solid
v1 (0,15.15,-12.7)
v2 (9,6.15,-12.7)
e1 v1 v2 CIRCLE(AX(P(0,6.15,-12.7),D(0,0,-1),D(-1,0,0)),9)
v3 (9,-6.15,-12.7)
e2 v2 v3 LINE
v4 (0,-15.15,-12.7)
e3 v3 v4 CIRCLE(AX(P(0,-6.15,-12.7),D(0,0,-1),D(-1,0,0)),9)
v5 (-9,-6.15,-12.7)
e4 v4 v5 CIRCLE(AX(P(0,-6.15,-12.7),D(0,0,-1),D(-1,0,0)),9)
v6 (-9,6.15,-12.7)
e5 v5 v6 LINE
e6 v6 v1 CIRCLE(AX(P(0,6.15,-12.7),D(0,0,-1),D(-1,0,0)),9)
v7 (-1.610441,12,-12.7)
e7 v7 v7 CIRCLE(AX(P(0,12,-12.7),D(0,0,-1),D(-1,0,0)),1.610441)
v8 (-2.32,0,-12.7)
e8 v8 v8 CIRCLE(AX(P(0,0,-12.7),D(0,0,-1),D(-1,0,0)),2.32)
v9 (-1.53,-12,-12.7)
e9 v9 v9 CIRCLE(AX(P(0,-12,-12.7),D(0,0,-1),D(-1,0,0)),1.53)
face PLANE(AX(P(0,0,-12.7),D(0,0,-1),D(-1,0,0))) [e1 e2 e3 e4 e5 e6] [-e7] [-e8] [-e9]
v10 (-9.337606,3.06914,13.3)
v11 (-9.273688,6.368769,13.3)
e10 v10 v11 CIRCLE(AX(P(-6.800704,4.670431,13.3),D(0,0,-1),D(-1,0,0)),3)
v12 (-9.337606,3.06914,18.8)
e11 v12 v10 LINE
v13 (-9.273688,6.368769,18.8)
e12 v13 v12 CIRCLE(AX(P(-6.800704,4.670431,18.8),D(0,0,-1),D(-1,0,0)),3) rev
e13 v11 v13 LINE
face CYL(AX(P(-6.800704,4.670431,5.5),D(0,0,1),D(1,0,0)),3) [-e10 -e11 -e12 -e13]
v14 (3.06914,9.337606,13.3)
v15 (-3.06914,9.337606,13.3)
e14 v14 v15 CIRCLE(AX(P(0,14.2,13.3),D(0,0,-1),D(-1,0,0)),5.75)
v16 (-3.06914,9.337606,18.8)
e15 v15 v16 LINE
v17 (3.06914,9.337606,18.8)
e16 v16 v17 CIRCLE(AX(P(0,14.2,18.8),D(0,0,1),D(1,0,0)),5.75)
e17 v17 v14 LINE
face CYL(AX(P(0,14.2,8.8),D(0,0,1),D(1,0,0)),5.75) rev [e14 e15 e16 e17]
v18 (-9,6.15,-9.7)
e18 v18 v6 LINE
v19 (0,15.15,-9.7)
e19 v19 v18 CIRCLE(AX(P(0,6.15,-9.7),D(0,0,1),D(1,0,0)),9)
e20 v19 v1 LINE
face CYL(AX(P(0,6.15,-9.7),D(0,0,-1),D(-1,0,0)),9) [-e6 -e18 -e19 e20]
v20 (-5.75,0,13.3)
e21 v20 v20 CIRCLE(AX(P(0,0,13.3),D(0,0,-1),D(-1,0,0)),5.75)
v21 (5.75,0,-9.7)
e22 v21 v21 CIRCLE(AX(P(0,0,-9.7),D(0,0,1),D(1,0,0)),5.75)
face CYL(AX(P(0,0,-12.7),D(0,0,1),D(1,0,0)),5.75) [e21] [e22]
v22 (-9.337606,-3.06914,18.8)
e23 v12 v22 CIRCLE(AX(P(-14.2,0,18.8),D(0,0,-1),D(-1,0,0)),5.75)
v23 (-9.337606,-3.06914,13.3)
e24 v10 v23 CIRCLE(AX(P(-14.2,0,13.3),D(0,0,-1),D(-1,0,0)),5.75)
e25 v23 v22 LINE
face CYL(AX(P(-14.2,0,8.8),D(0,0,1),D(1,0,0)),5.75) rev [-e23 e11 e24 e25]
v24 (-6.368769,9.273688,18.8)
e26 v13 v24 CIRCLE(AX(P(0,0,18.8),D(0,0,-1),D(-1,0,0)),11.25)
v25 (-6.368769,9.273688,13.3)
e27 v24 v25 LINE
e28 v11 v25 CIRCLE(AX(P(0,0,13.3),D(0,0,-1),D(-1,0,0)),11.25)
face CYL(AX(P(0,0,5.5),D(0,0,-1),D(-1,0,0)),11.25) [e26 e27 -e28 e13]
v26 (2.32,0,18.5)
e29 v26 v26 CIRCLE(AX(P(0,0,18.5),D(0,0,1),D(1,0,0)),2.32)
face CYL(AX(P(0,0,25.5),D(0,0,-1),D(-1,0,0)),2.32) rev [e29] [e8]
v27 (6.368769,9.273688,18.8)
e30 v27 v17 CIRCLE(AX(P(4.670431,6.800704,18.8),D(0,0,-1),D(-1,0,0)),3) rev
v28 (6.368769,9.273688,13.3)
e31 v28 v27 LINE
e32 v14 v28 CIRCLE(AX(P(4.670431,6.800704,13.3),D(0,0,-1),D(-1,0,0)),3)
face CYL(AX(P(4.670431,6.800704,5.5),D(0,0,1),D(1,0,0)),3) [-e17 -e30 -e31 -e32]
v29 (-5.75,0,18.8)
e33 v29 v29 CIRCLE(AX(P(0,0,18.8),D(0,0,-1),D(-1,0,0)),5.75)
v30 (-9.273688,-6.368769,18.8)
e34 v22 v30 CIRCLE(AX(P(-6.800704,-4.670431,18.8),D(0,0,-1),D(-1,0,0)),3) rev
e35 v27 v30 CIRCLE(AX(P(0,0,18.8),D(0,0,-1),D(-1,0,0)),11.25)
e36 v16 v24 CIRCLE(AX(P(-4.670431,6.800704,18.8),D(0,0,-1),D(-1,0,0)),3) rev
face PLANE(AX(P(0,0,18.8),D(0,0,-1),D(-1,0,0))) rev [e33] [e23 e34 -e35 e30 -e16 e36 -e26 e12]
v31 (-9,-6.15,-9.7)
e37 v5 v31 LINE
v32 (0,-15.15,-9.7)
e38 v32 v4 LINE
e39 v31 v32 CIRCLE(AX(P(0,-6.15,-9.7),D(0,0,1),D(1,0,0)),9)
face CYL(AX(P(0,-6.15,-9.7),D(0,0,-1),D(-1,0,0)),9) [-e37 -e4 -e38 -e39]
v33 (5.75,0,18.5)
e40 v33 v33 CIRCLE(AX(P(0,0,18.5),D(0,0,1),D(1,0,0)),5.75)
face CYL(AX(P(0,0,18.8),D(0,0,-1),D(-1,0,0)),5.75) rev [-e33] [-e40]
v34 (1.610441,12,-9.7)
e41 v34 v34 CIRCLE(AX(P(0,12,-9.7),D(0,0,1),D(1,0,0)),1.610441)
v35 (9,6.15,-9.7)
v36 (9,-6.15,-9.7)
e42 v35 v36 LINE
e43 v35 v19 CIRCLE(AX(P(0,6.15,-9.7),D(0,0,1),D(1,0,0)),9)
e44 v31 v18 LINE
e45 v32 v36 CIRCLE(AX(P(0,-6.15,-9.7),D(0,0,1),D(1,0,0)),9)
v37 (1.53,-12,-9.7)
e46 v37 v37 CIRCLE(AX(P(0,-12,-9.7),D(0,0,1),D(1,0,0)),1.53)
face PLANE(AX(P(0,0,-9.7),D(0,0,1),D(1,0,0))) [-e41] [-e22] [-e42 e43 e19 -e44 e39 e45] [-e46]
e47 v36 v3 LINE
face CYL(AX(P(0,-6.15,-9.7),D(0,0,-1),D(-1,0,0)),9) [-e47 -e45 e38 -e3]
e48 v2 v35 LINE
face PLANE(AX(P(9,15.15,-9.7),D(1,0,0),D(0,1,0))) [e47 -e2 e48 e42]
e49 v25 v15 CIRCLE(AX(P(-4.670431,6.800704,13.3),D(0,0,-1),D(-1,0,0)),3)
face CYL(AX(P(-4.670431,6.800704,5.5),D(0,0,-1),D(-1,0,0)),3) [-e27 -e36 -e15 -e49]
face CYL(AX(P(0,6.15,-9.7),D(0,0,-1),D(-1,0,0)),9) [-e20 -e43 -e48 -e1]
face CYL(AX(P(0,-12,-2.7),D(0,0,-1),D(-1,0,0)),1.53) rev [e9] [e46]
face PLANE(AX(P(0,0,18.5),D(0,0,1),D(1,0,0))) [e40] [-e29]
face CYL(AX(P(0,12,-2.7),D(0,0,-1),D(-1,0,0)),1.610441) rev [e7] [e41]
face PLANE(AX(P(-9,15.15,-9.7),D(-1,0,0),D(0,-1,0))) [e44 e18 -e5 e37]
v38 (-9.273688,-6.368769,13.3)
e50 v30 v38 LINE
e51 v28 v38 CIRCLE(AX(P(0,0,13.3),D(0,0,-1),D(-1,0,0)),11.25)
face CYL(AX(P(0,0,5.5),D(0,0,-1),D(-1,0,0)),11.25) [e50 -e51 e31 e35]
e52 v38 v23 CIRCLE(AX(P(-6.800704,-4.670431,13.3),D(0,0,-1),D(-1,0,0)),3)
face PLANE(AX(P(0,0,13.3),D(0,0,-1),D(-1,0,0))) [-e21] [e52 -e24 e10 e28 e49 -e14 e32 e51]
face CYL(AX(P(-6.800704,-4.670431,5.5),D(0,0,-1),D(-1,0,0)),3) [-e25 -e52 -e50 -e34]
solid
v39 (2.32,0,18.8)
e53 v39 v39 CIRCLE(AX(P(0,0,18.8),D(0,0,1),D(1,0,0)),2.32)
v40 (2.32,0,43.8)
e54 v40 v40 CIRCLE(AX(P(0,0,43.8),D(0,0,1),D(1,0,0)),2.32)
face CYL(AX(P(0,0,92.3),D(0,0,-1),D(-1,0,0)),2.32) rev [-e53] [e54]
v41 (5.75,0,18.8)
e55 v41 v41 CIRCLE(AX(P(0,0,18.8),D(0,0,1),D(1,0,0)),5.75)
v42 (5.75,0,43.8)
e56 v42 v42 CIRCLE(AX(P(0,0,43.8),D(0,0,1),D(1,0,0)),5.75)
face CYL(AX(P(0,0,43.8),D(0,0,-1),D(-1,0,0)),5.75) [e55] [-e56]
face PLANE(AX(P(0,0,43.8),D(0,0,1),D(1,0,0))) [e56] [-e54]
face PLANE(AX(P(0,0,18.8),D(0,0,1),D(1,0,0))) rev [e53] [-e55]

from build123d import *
from build123d.topology import SkipClean

# Parameters (mm, degrees)
CROQUIS4_R               = 5.75
SALIENTE_EXTRUIR3_DEPTH  = 15.5
CROQUIS5_R               = 11.25
SALIENTE_EXTRUIR4_DEPTH  = 5.5
CROQUIS7_R               = 2.32
CORTAR_EXTRUIR2_DEPTH    = 25.5
SALIENTE_EXTRUIR5_START  = 12.7
CROQUIS8_R               = 5.75
SALIENTE_EXTRUIR5_DEPTH  = 12.7
CROQUIS9_W               = 18
CROQUIS9_H               = 30.3
SALIENTE_EXTRUIR6_DEPTH  = 3
CORTAR_EXTRUIR3_START    = -53
CROQUIS10_R              = 2.32
CORTAR_EXTRUIR3_DEPTH    = 53
REDONDEO5_R              = 9
CROQUIS14_R              = 1.610440683
CROQUIS14_R_2            = 1.53
CORTAR_EXTRUIR4_DEPTH    = 10
CROQUIS15_R              = 5.75
CROQUIS15_R_2            = 2.32
SALIENTE_EXTRUIR8_DEPTH  = 3
CROQUIS22_R              = 11.25
SALIENTE_EXTRUIR10_DEPTH = 10
CROQUIS24_R              = 23.765334052
CROQUIS24_R_2            = 5.75
CORTAR_EXTRUIR7_DEPTH    = 22.5
CROQUIS25_R              = 11.25
SALIENTE_EXTRUIR11_DEPTH = 5.5
CROQUIS27_R              = 11.25
CROQUIS27_R_2            = 5.75
CORTAR_EXTRUIR10_DEPTH   = 0.5
CROQUIS29_R              = 11.25
CROQUIS29_R_2            = 5.75
SALIENTE_EXTRUIR12_DEPTH = 5.5
CROQUIS30_R              = 5.75
SALIENTE_EXTRUIR13_DEPTH = 25
CROQUIS31_R              = 2.32
CORTAR_EXTRUIR11_DEPTH   = 105
CROQUIS32_R              = 5.75
CORTAR_EXTRUIR12_DEPTH   = 10
REDONDEO6_R              = 3


with BuildPart() as part:
    # Croquis4 → Saliente-Extruir3 (new body)
    with BuildSketch(Plane.XY):
        Circle(CROQUIS4_R)
    extrude(amount=SALIENTE_EXTRUIR3_DEPTH)

    # Croquis5 → Saliente-Extruir4 (add)
    with BuildSketch(Plane(origin=(0, 0, 0), x_dir=(-1, 0, 0), z_dir=(0, 0, -1))):
        Circle(CROQUIS5_R)
    extrude(amount=-SALIENTE_EXTRUIR4_DEPTH)

    # Croquis7 → Cortar-Extruir2 (cut)
    with BuildSketch(Plane(origin=(0, 0, 0), x_dir=(-1, 0, 0), z_dir=(0, 0, -1))):
        Circle(CROQUIS7_R)
    extrude(amount=-CORTAR_EXTRUIR2_DEPTH, mode=Mode.SUBTRACT)

    # Croquis8 → Saliente-Extruir5 (add)
    with BuildSketch(Plane(origin=(0, 0, 0), x_dir=(-1, 0, 0), z_dir=(0, 0, -1)).offset(SALIENTE_EXTRUIR5_START)):
        Circle(CROQUIS8_R)
    extrude(amount=-SALIENTE_EXTRUIR5_DEPTH)

    # Croquis9 → Saliente-Extruir6 (add)
    with BuildSketch(Plane(origin=(0, 0, -12.7), x_dir=(-1, 0, 0), z_dir=(0, 0, -1))):
        Rectangle(CROQUIS9_W, CROQUIS9_H)
    extrude(amount=-SALIENTE_EXTRUIR6_DEPTH)

    # Croquis10 → Cortar-Extruir3 (cut)
    with BuildSketch(Plane.XY.offset(15.5).offset(CORTAR_EXTRUIR3_START)):
        with Locations(Location((0, 0, 0), (0, 0, 180))):
            Circle(CROQUIS10_R)
    extrude(amount=CORTAR_EXTRUIR3_DEPTH, mode=Mode.SUBTRACT)

    # Redondeo5
    redondeo5_edges = [part.edges().sort_by_distance(p)[0] for p in [
        (9, -15.15, -11.2),
        (-9, -15.15, -11.2),
        (-9, 15.15, -11.2),
        (9, 15.15, -11.2),
    ]]
    fillet(redondeo5_edges, radius=REDONDEO5_R - 0.0001)  # a hair under: the kernel refuses the full size

    # Croquis14 → Cortar-Extruir4 (cut)
    with BuildSketch(Plane(origin=(0, 0, -12.7), x_dir=(-1, 0, 0), z_dir=(0, 0, -1))):
        with Locations((0, 12)):
            Circle(CROQUIS14_R)
        with Locations((0, -12)):
            Circle(CROQUIS14_R_2)
    extrude(amount=-CORTAR_EXTRUIR4_DEPTH, mode=Mode.SUBTRACT)

    # Croquis15 → Saliente-Extruir8 (add)
    with SkipClean():  # the faces are left unmerged after this step: merging them gives an invalid solid
        with BuildSketch(Plane.XY.offset(15.5)):
            with Locations(Location((0, 0, 0), (0, 0, 180))):
                Circle(CROQUIS15_R)
            with Locations(Location((0, 0, 0), (0, 0, 180))):
                Circle(CROQUIS15_R_2, mode=Mode.SUBTRACT)
        extrude(amount=SALIENTE_EXTRUIR8_DEPTH)

    # Croquis22 → Saliente-Extruir10 (add)
    with BuildSketch(Plane.XY.offset(5.5)):
        with Locations(Location((0, 0, 0), (0, 0, 180))):
            Circle(CROQUIS22_R)
    extrude(amount=SALIENTE_EXTRUIR10_DEPTH)

    # Croquis24 → Cortar-Extruir7 (cut)
    with BuildSketch(Plane.XY.offset(-9.7)):
        Circle(CROQUIS24_R)
        Circle(CROQUIS24_R_2, mode=Mode.SUBTRACT)
    extrude(amount=CORTAR_EXTRUIR7_DEPTH, mode=Mode.SUBTRACT)

    # Croquis25 → Saliente-Extruir11 (add)
    with SkipClean():  # the faces are left unmerged after this step: merging them gives an invalid solid
        with BuildSketch(Plane(origin=(0, 0, 12.8), x_dir=(-1, 0, 0), z_dir=(0, 0, -1))):
            Circle(CROQUIS25_R)
        extrude(amount=-SALIENTE_EXTRUIR11_DEPTH)

    # Croquis27 → Cortar-Extruir10 (cut)
    with SkipClean():  # the faces are left unmerged after this step: merging them gives an invalid solid
        with BuildSketch(Plane(origin=(0, 0, 12.8), x_dir=(-1, 0, 0), z_dir=(0, 0, -1))):
            Circle(CROQUIS27_R)
            Circle(CROQUIS27_R_2, mode=Mode.SUBTRACT)
        extrude(amount=-CORTAR_EXTRUIR10_DEPTH, mode=Mode.SUBTRACT)

    # Croquis29 → Saliente-Extruir12 (add)
    with SkipClean():  # the faces are left unmerged after this step: merging them gives an invalid solid
        with BuildSketch(Plane(origin=(0, 0, 13.3), x_dir=(-1, 0, 0), z_dir=(0, 0, -1))):
            Circle(CROQUIS29_R)
            with Locations(Location((0, 0, 0), (0, 0, 180))):
                Circle(CROQUIS29_R_2, mode=Mode.SUBTRACT)
        extrude(amount=-SALIENTE_EXTRUIR12_DEPTH)


with BuildPart() as body_2:
    # Croquis30 → Saliente-Extruir13 (new body)
    with BuildSketch(Plane.XY.offset(18.8)):
        Circle(CROQUIS30_R)
    extrude(amount=SALIENTE_EXTRUIR13_DEPTH)


with BuildPart() as cortar_extruir11_tool:
    # Croquis31 → Cortar-Extruir11 (new body)
    with BuildSketch(Plane(origin=(0, 0, -12.7), x_dir=(-1, 0, 0), z_dir=(0, 0, -1))):
        with Locations(Location((0, 0, 0), (0, 0, 180))):
            Circle(CROQUIS31_R)
    extrude(amount=-CORTAR_EXTRUIR11_DEPTH)


with BuildPart() as part_1:
    add(part.part)

    # Cortar-Extruir11: cut by cortar_extruir11_tool
    add(cortar_extruir11_tool.part, mode=Mode.SUBTRACT)

    # Croquis32 → Cortar-Extruir12 (cut)
    with BuildSketch(Plane.XY.offset(18.8)):
        with Locations((-14.2, 0)):
            Circle(CROQUIS32_R)
        with Locations((0, 14.2)):
            Circle(CROQUIS32_R)
    extrude(amount=-CORTAR_EXTRUIR12_DEPTH, mode=Mode.SUBTRACT)

    # Redondeo6
    redondeo6_edges = [part_1.edges().sort_by_distance(p)[0] for p in [
        (-10.392253521, 4.308545782, 16.9),
        (-10.392253521, -4.308545782, 16.9),
        (4.308545782, 10.392253521, 16.9),
        (-4.308545782, 10.392253521, 16.9),
    ]]
    fillet(redondeo6_edges, radius=REDONDEO6_R)


with BuildPart() as body_2_1:
    add(body_2.part)

    # Cortar-Extruir11: cut by cortar_extruir11_tool
    add(cortar_extruir11_tool.part, mode=Mode.SUBTRACT)


solid = Compound([part_1.part, body_2_1.part])
